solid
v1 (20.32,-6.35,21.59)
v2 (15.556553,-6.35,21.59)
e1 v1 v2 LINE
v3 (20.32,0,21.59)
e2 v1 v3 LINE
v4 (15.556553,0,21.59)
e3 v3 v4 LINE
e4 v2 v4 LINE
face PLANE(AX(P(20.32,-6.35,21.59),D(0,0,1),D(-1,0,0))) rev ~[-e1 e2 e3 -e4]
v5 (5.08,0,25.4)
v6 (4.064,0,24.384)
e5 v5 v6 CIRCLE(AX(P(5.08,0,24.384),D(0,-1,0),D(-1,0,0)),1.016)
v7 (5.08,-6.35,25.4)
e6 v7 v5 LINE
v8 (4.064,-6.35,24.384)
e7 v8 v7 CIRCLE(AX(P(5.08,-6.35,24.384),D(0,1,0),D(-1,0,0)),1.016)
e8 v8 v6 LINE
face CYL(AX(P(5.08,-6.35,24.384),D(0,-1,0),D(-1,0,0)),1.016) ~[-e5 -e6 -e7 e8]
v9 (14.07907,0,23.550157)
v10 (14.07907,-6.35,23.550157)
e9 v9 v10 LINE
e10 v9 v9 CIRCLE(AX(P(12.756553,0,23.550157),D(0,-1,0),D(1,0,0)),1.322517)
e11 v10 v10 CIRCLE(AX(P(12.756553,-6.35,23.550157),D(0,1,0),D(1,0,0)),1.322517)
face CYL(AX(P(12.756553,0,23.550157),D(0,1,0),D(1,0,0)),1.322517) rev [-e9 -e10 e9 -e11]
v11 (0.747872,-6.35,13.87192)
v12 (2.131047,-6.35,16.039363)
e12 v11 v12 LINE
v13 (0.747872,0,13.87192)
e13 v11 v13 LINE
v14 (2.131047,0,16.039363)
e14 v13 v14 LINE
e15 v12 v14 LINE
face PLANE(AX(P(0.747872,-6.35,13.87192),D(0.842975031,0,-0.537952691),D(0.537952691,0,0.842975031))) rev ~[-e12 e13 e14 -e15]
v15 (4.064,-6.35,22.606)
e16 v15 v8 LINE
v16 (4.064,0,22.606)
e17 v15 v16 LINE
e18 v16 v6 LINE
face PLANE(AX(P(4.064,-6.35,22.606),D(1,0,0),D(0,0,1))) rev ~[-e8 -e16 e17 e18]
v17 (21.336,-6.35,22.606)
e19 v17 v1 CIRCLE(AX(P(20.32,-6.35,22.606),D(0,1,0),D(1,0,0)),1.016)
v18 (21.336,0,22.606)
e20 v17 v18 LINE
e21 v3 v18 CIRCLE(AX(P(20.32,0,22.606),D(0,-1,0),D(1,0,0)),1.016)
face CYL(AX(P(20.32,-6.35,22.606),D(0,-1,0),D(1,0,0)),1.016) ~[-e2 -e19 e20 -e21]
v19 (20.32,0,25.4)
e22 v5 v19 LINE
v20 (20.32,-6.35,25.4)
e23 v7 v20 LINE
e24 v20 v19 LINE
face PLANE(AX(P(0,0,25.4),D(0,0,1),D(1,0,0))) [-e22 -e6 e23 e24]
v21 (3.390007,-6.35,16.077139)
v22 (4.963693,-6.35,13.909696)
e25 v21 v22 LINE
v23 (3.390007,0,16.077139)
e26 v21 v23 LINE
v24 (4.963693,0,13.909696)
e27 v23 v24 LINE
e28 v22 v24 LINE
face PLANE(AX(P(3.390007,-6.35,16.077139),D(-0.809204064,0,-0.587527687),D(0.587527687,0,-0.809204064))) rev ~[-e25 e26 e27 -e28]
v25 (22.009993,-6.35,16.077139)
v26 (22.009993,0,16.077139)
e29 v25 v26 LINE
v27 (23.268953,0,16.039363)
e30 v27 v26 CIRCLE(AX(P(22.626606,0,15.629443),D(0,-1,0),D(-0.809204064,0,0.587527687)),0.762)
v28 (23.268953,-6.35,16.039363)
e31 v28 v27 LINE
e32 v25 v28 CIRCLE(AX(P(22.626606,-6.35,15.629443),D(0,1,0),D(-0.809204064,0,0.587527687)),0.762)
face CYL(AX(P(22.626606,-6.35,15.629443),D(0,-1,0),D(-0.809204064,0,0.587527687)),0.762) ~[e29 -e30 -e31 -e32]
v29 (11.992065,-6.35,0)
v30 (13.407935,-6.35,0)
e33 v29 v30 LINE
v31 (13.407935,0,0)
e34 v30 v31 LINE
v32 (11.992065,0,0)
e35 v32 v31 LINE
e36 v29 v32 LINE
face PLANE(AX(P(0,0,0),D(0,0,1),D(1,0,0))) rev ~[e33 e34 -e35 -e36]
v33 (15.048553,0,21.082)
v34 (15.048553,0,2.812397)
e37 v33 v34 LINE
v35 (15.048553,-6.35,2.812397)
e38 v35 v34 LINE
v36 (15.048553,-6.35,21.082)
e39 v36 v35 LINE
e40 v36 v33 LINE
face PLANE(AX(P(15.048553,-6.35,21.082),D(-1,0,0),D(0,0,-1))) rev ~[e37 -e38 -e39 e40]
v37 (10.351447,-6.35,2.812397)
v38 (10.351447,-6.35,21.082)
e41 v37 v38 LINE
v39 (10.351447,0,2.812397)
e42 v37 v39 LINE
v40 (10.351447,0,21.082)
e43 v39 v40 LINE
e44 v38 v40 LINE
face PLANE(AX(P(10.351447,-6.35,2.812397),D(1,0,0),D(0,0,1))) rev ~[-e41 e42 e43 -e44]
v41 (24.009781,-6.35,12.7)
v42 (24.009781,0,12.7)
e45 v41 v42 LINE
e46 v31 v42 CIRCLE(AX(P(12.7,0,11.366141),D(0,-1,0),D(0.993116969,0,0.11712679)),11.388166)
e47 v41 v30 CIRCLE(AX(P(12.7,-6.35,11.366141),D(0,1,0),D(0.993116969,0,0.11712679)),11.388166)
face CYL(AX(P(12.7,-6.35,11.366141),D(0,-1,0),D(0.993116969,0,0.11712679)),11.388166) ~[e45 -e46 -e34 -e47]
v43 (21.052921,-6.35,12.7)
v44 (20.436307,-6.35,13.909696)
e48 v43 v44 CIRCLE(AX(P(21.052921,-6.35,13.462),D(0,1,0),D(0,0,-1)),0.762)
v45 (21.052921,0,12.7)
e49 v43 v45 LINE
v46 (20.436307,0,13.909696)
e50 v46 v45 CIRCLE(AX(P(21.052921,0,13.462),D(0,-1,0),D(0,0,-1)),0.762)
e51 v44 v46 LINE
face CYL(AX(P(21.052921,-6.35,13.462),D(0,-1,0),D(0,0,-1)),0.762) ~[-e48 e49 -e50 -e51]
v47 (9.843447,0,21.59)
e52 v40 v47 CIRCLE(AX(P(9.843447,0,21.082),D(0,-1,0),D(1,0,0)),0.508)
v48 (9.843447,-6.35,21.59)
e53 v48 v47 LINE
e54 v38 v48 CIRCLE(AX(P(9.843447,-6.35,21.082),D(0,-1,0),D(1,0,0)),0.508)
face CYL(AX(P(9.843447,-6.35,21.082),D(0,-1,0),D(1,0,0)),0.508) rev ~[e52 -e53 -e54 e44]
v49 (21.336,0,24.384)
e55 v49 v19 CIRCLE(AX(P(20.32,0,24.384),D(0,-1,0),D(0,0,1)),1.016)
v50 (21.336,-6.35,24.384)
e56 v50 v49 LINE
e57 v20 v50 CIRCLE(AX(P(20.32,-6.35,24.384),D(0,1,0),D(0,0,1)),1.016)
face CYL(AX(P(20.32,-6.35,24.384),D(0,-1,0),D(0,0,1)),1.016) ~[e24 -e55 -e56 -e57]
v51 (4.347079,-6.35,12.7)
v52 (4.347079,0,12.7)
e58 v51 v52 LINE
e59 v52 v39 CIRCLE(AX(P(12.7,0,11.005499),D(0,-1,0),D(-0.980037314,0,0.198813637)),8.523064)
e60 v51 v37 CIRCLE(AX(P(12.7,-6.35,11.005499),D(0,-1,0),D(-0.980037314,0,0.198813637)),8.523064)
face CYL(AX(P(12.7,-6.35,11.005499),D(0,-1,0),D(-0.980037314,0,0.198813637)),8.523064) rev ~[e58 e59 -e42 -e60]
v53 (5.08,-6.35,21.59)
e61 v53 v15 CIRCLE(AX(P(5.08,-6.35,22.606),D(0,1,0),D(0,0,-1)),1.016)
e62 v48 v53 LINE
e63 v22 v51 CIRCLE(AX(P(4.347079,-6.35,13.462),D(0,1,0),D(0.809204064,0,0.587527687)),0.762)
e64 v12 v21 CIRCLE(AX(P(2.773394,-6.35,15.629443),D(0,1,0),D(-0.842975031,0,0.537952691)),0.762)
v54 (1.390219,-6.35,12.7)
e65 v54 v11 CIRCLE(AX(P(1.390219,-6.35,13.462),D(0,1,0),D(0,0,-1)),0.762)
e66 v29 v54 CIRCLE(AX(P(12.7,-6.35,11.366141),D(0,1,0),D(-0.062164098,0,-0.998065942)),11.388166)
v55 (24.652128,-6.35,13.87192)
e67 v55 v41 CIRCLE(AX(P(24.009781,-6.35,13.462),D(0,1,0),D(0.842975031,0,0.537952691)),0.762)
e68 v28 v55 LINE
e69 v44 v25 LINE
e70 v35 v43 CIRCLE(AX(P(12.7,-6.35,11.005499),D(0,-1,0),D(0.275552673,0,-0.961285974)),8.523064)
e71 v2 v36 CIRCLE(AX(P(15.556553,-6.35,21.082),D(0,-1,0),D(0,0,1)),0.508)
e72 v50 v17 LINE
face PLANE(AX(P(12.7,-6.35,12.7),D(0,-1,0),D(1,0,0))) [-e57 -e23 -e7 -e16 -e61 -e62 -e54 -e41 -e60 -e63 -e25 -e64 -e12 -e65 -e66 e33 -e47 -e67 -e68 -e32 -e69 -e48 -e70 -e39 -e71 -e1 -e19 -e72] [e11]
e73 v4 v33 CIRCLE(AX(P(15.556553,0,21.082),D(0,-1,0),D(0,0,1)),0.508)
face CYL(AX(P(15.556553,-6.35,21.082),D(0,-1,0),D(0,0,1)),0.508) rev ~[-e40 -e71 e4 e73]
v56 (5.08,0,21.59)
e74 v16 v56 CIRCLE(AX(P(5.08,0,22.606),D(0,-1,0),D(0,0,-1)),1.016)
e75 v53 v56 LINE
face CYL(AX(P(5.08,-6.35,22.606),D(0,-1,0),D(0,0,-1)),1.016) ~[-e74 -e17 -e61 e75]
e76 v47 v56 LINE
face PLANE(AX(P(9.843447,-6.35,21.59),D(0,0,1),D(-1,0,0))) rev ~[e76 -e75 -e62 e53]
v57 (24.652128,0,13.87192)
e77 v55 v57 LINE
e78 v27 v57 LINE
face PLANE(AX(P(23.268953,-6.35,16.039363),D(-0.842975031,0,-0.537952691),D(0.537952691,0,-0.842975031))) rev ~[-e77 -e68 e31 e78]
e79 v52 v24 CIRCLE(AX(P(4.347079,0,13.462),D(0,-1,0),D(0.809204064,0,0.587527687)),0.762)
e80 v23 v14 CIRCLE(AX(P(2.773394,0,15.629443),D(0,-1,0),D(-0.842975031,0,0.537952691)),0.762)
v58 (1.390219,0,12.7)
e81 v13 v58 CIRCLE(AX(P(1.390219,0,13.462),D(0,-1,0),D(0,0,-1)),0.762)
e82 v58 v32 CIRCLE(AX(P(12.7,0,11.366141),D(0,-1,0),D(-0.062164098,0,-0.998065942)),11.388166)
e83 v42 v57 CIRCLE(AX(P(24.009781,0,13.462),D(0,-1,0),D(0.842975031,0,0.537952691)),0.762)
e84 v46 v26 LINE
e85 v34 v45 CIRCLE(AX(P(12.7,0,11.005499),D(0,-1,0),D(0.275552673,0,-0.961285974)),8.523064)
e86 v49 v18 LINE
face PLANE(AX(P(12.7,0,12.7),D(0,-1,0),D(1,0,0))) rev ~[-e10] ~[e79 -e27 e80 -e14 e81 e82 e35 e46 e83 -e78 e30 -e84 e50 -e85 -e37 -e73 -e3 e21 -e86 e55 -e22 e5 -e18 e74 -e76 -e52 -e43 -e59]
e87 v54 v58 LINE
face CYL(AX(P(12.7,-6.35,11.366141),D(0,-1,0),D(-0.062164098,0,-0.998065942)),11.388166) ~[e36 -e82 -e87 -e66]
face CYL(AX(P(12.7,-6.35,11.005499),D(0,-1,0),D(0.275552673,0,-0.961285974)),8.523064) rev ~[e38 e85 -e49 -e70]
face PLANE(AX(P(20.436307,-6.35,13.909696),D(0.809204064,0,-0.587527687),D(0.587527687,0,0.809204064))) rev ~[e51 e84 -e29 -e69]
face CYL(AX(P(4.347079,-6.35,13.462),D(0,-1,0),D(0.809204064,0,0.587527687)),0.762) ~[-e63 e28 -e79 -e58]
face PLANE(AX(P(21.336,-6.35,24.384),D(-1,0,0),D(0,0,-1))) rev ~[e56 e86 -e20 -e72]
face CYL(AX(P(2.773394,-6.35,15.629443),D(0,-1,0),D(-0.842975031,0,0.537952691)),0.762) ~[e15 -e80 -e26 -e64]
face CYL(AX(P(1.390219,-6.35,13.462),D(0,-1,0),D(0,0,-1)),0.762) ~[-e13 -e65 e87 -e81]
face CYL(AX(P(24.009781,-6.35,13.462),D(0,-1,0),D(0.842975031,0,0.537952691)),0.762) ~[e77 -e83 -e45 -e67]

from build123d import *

# Parameters (mm, degrees)
F0_W     = 25.4
F0_H     = 25.4
F1_DEPTH = 6.35
F3_DEPTH = 25.4
F4_R     = 1.3225172329
F5_DEPTH = 25.4


# Not quite as in the source:
# - a feature names something its author has since deleted; it is built from what else it names


with BuildPart() as f1:
    # F0 (on Front) → F1 (new body)
    with BuildSketch(Plane.XZ):
        with Locations((12.7, 12.7)):
            Rectangle(F0_W, F0_H)
    extrude(amount=F1_DEPTH)

    # F2 (on face) → F3 (cut)
    with BuildSketch(Plane.XZ.offset(6.35)):
        with BuildLine():
            ThreePointArc((4.347079063, 12.7), (5.4149768535, 6.5815794315), (10.3514468814, 2.8123965482))
            Line((10.3514468814, 2.8123965482), (10.3514468814, 21.082))
            ThreePointArc((10.3514468814, 21.082), (10.2026571262, 21.4412102448), (9.8434468814, 21.59))
            Line((9.8434468814, 21.59), (5.08, 21.59))
            ThreePointArc((5.08, 21.59), (4.3615795103, 21.8875795103), (4.064, 22.606))
            Line((4.064, 22.606), (4.064, 24.384))
            ThreePointArc((4.064, 24.384), (4.3615795103, 25.1024204897), (5.08, 25.4))
            Line((5.08, 25.4), (0, 25.4))
            Line((0, 25.4), (0, 0))
            Line((0, 0), (11.9920649295, 0))
            ThreePointArc((11.9920649295, 0), (3.957639074, 4.0680963279), (1.3902190546, 12.7))
            ThreePointArc((1.3902190546, 12.7), (0.7220113765, 13.0957453087), (0.7478720811, 13.8719199503))
            Line((0.7478720811, 13.8719199503), (2.1310466878, 16.0393626953))
            ThreePointArc((2.1310466878, 16.0393626953), (2.7505395089, 16.3910999432), (3.390007158, 16.0771388424))
            Line((3.390007158, 16.0771388424), (4.9636925598, 13.9096960974))
            ThreePointArc((4.9636925598, 13.9096960974), (5.025970964, 13.1159511785), (4.347079063, 12.7))
        make_face()
        with BuildLine():
            Line((25.4, 25.4), (20.32, 25.4))
            ThreePointArc((20.32, 25.4), (21.0384204897, 25.1024204897), (21.336, 24.384))
            Line((21.336, 24.384), (21.336, 22.606))
            ThreePointArc((21.336, 22.606), (21.0384204897, 21.8875795103), (20.32, 21.59))
            Line((20.32, 21.59), (15.5565531186, 21.59))
            ThreePointArc((15.5565531186, 21.59), (15.1973428738, 21.4412102448), (15.0485531186, 21.082))
            Line((15.0485531186, 21.082), (15.0485531186, 15.5096852131))
            Line((15.0485531186, 15.5096852131), (15.0485531186, 2.8123965482))
            ThreePointArc((15.0485531186, 2.8123965482), (19.9850231465, 6.5815794315), (21.052920937, 12.7))
            ThreePointArc((21.052920937, 12.7), (20.374029036, 13.1159511785), (20.4363074402, 13.9096960974))
            Line((20.4363074402, 13.9096960974), (22.009992842, 16.0771388424))
            ThreePointArc((22.009992842, 16.0771388424), (22.6494604911, 16.3910999432), (23.2689533122, 16.0393626953))
            Line((23.2689533122, 16.0393626953), (24.6521279189, 13.8719199503))
            ThreePointArc((24.6521279189, 13.8719199503), (24.6779886235, 13.0957453087), (24.0097809454, 12.7))
            ThreePointArc((24.0097809454, 12.7), (21.442360926, 4.0680963279), (13.4079350705, 0))
            Line((13.4079350705, 0), (25.4, 0))
            Line((25.4, 0), (25.4, 25.4))
        make_face()
    extrude(amount=-F3_DEPTH, mode=Mode.SUBTRACT)

    # F4 (on Front) → F5 (cut)
    with BuildSketch(Plane.XZ):
        with Locations((12.7565525472, 23.5501565039)):
            Circle(F4_R)
    extrude(amount=F5_DEPTH, mode=Mode.SUBTRACT)


solid = f1.part
